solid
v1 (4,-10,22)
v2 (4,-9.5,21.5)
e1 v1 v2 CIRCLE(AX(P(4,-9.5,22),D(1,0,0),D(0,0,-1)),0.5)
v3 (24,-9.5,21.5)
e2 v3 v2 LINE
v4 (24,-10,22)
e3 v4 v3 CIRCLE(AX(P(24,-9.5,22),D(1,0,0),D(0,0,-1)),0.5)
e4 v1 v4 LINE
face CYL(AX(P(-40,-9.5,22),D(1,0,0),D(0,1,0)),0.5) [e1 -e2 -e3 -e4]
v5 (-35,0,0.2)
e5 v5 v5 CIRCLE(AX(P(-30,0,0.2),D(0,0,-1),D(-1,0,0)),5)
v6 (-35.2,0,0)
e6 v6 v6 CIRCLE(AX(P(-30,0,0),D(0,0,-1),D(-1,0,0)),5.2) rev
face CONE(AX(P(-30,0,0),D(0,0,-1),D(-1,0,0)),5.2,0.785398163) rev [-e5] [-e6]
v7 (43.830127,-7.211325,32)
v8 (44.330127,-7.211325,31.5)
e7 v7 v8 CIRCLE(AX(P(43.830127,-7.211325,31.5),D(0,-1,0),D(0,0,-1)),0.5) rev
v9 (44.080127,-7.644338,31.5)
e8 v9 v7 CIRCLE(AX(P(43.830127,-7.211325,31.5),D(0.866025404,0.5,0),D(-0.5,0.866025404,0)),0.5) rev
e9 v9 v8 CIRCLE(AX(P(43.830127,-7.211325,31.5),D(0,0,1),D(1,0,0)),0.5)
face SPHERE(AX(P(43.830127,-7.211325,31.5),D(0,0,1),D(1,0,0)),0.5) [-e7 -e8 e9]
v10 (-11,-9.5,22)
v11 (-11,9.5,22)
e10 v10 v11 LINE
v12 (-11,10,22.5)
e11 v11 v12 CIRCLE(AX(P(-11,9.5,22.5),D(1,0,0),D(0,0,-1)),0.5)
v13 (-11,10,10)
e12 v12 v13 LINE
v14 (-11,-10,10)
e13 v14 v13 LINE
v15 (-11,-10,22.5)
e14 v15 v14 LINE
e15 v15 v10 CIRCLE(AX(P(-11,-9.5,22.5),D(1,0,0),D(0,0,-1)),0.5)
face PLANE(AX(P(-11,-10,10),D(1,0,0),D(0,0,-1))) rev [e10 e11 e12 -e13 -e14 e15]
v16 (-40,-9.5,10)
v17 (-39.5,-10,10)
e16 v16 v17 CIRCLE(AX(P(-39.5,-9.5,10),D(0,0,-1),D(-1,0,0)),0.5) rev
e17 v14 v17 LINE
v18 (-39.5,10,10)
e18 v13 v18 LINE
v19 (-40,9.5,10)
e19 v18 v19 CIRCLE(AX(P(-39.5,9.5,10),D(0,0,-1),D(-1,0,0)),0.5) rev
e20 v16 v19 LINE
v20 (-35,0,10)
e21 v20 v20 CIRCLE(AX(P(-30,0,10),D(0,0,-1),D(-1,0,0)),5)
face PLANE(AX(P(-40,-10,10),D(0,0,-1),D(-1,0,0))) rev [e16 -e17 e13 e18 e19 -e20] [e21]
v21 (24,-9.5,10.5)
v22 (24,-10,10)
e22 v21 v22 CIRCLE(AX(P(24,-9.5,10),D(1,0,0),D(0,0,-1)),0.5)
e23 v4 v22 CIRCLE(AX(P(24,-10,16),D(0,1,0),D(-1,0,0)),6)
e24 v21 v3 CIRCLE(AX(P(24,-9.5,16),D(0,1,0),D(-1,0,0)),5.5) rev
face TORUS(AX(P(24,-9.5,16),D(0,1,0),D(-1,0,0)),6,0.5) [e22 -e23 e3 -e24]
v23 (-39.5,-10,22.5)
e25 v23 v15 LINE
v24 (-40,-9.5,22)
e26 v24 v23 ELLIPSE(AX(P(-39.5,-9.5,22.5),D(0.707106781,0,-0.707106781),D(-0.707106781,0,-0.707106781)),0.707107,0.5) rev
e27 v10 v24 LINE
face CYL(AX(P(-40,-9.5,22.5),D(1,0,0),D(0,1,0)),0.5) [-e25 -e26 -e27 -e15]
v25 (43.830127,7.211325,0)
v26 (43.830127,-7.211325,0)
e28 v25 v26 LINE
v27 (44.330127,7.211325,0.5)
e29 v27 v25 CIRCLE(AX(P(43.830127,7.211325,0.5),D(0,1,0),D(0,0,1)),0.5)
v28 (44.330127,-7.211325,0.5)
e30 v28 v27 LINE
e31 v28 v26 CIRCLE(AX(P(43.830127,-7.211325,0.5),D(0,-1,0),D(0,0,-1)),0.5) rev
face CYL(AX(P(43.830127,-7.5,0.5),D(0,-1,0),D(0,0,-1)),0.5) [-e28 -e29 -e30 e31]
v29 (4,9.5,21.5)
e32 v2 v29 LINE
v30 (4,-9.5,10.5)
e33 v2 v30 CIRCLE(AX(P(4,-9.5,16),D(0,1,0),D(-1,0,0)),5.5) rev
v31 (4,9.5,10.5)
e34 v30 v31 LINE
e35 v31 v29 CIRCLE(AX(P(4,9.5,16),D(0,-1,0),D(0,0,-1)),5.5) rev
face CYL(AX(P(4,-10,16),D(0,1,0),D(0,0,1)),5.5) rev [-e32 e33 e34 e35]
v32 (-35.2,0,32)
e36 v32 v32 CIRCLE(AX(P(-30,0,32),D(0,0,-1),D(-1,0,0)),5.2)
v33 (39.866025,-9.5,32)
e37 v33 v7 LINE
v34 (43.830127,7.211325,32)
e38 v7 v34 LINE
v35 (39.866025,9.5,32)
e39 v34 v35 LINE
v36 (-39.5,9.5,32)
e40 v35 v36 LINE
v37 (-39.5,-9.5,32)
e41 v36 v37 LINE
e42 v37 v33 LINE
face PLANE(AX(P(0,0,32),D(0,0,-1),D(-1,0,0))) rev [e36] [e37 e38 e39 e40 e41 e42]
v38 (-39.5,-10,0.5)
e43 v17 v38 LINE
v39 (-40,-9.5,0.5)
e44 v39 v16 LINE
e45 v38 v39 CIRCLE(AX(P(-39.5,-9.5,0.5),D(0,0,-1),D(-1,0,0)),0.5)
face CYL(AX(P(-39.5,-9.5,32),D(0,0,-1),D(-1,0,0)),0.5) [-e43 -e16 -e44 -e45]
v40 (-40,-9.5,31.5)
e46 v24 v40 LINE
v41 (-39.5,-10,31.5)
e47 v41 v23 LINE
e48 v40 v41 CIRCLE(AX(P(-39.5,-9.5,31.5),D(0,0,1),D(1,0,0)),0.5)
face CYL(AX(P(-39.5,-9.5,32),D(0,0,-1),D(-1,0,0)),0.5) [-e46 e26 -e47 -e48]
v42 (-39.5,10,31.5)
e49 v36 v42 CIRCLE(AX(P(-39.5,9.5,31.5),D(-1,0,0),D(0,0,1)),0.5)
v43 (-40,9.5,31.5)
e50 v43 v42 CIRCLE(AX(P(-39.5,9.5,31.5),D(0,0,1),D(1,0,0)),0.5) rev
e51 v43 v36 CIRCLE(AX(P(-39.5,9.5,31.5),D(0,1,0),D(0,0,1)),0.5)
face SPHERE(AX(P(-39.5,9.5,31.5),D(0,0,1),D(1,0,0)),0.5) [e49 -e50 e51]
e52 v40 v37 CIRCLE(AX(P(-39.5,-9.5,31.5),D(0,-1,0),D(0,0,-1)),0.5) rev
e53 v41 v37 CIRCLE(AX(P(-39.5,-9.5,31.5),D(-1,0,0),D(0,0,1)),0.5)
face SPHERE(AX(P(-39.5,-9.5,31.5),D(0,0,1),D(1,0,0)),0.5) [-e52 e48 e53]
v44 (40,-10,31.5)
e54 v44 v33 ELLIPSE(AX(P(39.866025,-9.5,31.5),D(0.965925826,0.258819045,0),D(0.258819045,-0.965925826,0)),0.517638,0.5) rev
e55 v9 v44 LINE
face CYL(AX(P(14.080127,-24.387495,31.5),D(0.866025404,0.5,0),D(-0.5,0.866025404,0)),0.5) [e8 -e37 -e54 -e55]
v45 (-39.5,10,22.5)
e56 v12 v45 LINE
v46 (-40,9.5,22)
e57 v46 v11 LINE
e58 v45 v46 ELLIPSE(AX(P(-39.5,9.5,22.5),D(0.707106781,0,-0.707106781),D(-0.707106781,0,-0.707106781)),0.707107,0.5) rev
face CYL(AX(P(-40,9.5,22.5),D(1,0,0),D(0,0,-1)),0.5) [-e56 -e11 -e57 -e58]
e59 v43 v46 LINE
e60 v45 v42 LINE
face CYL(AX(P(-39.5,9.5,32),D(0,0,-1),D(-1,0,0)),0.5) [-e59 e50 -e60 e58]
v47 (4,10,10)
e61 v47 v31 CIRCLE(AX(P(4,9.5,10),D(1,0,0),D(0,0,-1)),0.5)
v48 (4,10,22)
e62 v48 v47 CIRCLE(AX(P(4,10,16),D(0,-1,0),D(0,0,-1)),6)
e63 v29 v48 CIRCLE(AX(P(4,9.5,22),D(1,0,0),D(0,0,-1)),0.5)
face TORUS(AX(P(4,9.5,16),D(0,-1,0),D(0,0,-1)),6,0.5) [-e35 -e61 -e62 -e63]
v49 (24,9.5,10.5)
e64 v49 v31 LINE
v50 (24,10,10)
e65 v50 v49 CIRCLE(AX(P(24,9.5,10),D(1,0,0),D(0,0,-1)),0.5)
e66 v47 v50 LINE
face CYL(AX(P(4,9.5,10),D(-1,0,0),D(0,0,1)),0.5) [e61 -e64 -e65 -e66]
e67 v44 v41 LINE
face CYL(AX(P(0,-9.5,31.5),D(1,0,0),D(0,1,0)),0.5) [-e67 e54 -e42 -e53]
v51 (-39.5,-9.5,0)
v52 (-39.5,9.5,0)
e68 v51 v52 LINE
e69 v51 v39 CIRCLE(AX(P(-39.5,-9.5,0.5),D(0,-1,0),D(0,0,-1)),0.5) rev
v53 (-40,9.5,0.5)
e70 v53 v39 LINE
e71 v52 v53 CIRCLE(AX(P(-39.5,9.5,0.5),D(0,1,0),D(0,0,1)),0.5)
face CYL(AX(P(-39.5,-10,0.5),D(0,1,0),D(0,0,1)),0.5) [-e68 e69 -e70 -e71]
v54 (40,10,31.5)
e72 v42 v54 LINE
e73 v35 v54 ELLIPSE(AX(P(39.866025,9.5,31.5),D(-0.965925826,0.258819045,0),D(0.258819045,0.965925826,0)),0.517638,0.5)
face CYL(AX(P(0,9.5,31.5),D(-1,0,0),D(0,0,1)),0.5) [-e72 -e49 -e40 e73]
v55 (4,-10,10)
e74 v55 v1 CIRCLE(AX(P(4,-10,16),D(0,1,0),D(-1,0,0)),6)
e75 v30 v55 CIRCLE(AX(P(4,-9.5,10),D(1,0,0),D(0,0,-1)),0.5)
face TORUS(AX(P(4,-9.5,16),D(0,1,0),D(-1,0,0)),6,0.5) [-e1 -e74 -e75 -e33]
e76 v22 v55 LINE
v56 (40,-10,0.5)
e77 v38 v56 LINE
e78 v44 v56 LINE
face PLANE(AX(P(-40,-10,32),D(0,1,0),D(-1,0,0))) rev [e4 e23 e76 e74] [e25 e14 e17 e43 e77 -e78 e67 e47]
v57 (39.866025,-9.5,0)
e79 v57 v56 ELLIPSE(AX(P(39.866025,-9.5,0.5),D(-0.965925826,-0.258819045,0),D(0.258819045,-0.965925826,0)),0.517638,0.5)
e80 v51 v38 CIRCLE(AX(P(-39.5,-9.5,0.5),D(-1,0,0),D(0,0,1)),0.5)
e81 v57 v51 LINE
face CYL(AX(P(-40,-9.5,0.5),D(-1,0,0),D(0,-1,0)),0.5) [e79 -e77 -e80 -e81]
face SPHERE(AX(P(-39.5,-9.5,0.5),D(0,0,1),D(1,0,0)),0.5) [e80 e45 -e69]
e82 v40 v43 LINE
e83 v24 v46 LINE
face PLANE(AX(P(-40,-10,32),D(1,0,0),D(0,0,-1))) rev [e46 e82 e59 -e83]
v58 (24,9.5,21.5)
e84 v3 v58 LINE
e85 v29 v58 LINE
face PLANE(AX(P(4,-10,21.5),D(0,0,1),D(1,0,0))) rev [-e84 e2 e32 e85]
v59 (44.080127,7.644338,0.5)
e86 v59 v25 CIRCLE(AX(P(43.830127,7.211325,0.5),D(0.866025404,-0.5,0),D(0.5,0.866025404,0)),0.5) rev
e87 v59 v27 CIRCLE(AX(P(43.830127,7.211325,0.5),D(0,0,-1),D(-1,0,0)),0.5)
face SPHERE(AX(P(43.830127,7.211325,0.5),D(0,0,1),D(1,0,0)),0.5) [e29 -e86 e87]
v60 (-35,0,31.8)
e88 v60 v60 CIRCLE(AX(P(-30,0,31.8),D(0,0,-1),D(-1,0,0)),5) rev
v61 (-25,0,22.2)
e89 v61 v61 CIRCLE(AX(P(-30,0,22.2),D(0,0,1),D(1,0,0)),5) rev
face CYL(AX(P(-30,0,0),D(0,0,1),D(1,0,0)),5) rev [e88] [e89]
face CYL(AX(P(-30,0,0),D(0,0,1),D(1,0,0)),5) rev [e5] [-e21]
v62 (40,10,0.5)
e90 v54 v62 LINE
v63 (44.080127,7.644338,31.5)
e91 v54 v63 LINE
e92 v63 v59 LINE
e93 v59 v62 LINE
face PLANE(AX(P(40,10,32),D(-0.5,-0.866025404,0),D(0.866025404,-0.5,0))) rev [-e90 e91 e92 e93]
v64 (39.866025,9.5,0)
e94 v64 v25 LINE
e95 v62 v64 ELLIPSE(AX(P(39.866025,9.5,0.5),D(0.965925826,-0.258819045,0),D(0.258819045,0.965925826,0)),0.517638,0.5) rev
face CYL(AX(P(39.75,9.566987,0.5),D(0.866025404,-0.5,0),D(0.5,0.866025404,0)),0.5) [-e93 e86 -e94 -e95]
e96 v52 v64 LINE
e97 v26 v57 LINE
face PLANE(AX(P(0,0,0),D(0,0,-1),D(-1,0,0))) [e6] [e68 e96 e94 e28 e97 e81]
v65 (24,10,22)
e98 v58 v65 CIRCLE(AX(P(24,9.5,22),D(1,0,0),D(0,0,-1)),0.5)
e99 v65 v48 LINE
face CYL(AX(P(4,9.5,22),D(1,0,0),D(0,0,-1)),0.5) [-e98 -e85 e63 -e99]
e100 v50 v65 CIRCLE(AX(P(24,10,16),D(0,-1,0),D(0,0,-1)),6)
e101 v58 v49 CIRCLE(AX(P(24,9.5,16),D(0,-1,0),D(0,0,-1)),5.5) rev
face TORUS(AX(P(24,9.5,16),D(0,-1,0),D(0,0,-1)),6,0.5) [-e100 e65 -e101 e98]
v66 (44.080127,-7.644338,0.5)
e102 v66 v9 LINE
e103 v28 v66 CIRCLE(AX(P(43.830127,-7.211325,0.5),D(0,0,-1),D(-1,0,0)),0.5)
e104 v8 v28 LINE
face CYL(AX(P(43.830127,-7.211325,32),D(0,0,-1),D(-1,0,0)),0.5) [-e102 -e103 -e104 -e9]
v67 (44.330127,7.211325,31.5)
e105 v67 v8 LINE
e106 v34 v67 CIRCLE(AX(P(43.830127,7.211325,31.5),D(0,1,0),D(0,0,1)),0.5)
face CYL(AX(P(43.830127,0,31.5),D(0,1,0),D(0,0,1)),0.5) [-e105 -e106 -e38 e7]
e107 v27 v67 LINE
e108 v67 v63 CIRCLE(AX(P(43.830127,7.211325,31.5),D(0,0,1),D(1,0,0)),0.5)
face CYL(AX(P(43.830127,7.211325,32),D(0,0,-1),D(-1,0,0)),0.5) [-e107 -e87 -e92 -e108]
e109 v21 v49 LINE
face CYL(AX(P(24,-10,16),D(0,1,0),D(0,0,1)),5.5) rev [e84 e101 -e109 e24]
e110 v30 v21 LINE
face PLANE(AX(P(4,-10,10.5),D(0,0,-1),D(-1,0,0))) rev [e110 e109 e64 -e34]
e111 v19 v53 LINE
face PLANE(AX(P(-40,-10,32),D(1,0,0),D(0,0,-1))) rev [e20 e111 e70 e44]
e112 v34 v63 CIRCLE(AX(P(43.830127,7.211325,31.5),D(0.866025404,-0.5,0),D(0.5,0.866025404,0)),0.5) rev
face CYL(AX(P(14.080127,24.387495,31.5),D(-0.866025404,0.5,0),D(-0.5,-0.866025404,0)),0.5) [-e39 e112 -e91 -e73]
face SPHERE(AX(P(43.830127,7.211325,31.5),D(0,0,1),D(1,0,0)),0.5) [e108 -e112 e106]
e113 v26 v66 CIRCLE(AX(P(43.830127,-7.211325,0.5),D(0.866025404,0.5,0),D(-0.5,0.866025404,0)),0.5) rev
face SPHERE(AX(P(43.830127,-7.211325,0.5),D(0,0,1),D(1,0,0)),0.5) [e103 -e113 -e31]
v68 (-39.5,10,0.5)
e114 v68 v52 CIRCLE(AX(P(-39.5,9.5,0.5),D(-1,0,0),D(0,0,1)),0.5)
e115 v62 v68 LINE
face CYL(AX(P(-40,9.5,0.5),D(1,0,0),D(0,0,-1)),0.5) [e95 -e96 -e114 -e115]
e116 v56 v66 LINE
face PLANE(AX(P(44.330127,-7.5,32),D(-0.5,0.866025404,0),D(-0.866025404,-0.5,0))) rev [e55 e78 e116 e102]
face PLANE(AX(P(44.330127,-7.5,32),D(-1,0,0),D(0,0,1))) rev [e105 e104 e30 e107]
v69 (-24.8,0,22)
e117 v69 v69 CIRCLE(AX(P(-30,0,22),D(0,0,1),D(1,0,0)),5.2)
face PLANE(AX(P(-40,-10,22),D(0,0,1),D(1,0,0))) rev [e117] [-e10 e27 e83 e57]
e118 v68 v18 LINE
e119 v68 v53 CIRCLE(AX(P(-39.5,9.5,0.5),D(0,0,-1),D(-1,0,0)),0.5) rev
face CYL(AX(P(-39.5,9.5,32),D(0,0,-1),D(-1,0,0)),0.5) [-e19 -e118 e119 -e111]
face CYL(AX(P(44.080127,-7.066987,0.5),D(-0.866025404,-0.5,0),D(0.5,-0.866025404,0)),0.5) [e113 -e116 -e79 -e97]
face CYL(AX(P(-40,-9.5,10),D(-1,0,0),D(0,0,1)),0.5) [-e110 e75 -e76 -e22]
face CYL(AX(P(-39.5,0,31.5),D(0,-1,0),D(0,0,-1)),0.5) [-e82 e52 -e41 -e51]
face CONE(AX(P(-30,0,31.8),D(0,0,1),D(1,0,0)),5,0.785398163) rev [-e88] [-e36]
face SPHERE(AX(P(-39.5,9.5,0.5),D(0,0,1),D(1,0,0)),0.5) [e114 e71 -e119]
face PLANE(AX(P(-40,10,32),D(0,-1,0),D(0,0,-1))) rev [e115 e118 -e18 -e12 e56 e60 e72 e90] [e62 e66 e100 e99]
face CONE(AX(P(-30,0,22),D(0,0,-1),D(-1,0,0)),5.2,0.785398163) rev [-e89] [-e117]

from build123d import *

# Parameters (mm, degrees)
BASE_BRIDE_DEPTH          = 32
CONG_BRIDE1_R             = 0.5
ESQUISSE_ENL_V_MAT_BRID_W = 29
ESQUISSE_ENL_V_MAT_BRID_H = 12
ENL_V_MATI_RE_BRIDE_DEPTH = 59.216493896
CONG_BRIDE2_R             = 0.5
ESQUISSE_PERCAGE_BRIDE_R  = 5
PERCAGE_BRIDE_DEPTH       = 56.580213759
CHANFREIN_BRIDE_SIZE      = 0.2


with BuildPart() as part:
    # esquisse_base_bride → Base_bride (new body)
    with BuildSketch(Plane.XY):
        Polygon((40, 10), (44.330127019, 7.5), (44.330127019, -7.5), (40, -10), (-40, -10), (-40, 10), align=None)
    extrude(amount=BASE_BRIDE_DEPTH)

    # congé_bride1
    cong_bride1_edges = [part.edges().sort_by_distance(p)[0] for p in [
        (42.165063509, -8.75, 32),
        (-40, 10, 16),
        (44.330127019, 7.5, 16),
        (44.330127019, -7.5, 16),
        (-40, -10, 16),
        (44.330127019, 0, 32),
        (42.165063509, 8.75, 32),
        (0, 10, 32),
        (-40, 0, 32),
        (0, 10, 0),
        (42.165063509, 8.75, 0),
        (44.330127019, 0, 0),
        (0, -10, 32),
        (42.165063509, -8.75, 0),
        (0, -10, 0),
        (-40, 0, 0),
    ]]
    fillet(cong_bride1_edges, radius=CONG_BRIDE1_R)

    # esquisse_enlèv.mat.brid → enlèv.matière_bride (cut, through all)
    with BuildSketch(Plane(origin=(0, 10, 0), x_dir=(1, 0, 0), z_dir=(0, 1, 0))):
        with Locations((-25.5, -16)):
            Rectangle(ESQUISSE_ENL_V_MAT_BRID_W, ESQUISSE_ENL_V_MAT_BRID_H)
        with BuildLine():
            Line((4, -10.5), (24, -10.5))
            ThreePointArc((24, -10.5), (29.5, -16), (24, -21.5))
            Line((24, -21.5), (4, -21.5))
            ThreePointArc((4, -21.5), (-1.5, -16), (4, -10.5))
        make_face()
    extrude(amount=-ENL_V_MATI_RE_BRIDE_DEPTH, mode=Mode.SUBTRACT)

    # congé_bride2
    # the kernel refuses this fillet: 0.5 mm, written as the material it takes off along each edge
    with BuildSketch(Plane(origin=(-40.75, -10, 22), x_dir=(0, 1, 0), z_dir=(1, 0, 0))) as cong_bride2_piece_1:
        with BuildLine():
            CenterArc((CONG_BRIDE2_R, CONG_BRIDE2_R), CONG_BRIDE2_R, 180, 90)
            Line((0, CONG_BRIDE2_R), (0, 0))
            Line((0, 0), (CONG_BRIDE2_R, 0))
        make_face()
    extrude(amount=29.75, mode=Mode.SUBTRACT)
    with BuildSketch(Plane(origin=(-11, 10, 22), x_dir=(0, 0, 1), z_dir=(-1, 0, 0))) as cong_bride2_piece_2:
        with BuildLine():
            CenterArc((CONG_BRIDE2_R, -CONG_BRIDE2_R), CONG_BRIDE2_R, 90, 90)
            Line((0, -CONG_BRIDE2_R), (0, 0))
            Line((0, 0), (CONG_BRIDE2_R, 0))
        make_face()
    extrude(amount=29.75, mode=Mode.SUBTRACT)
    with BuildSketch(Plane(origin=(24, 10, 16), x_dir=(0, 0, -1), z_dir=(-1, 0, 0))) as cong_bride2_piece_3:
        with BuildLine():
            CenterArc((5.5 + CONG_BRIDE2_R, CONG_BRIDE2_R), CONG_BRIDE2_R, 180, 90)
            Line((5.5, CONG_BRIDE2_R), (5.5, 0))
            Line((5.5, 0), (5.5 + CONG_BRIDE2_R, 0))
        make_face()
    revolve(axis=Axis((24, 10, 16), (0, -1, 0)), revolution_arc=180, mode=Mode.SUBTRACT)
    with BuildSketch(Plane(origin=(4, 10, 10.5), x_dir=(0, 0, -1), z_dir=(1, 0, 0)), Plane(origin=(24, 10, 21.5), x_dir=(0, 0, 1), z_dir=(-1, 0, 0))) as cong_bride2_piece_4:
        with BuildLine():
            CenterArc((CONG_BRIDE2_R, -CONG_BRIDE2_R), CONG_BRIDE2_R, 90, 90)
            Line((0, -CONG_BRIDE2_R), (0, 0))
            Line((0, 0), (CONG_BRIDE2_R, 0))
        make_face()
    extrude(amount=20, mode=Mode.SUBTRACT)
    with BuildSketch(Plane(origin=(4, 10, 16), x_dir=(0, 0, 1), z_dir=(1, 0, 0))) as cong_bride2_piece_5:
        with BuildLine():
            CenterArc((5.5 + CONG_BRIDE2_R, CONG_BRIDE2_R), CONG_BRIDE2_R, 180, 90)
            Line((5.5, CONG_BRIDE2_R), (5.5, 0))
            Line((5.5, 0), (5.5 + CONG_BRIDE2_R, 0))
        make_face()
    revolve(axis=Axis((4, 10, 16), (0, -1, 0)), revolution_arc=180, mode=Mode.SUBTRACT)
    with BuildSketch(Plane(origin=(24, -10, 16), x_dir=(0, 0, 1), z_dir=(-1, 0, 0))) as cong_bride2_piece_6:
        with BuildLine():
            CenterArc((5.5 + CONG_BRIDE2_R, CONG_BRIDE2_R), CONG_BRIDE2_R, 180, 90)
            Line((5.5 + CONG_BRIDE2_R, 0), (5.5, 0))
            Line((5.5, 0), (5.5, CONG_BRIDE2_R))
        make_face()
    revolve(axis=Axis((24, -10, 16), (0, 1, 0)), revolution_arc=180, mode=Mode.SUBTRACT)
    with BuildSketch(Plane(origin=(24, -10, 10.5), x_dir=(0, 1, 0), z_dir=(-1, 0, 0)), Plane(origin=(4, -10, 21.5), x_dir=(0, 1, 0), z_dir=(1, 0, 0))) as cong_bride2_piece_7:
        with BuildLine():
            CenterArc((CONG_BRIDE2_R, CONG_BRIDE2_R), CONG_BRIDE2_R, 180, 90)
            Line((0, CONG_BRIDE2_R), (0, 0))
            Line((0, 0), (CONG_BRIDE2_R, 0))
        make_face()
    extrude(amount=20, mode=Mode.SUBTRACT)
    with BuildSketch(Plane(origin=(4, -10, 16), x_dir=(0, 0, -1), z_dir=(1, 0, 0))) as cong_bride2_piece_8:
        with BuildLine():
            CenterArc((5.5 + CONG_BRIDE2_R, CONG_BRIDE2_R), CONG_BRIDE2_R, 180, 90)
            Line((5.5 + CONG_BRIDE2_R, 0), (5.5, 0))
            Line((5.5, 0), (5.5, CONG_BRIDE2_R))
        make_face()
    revolve(axis=Axis((4, -10, 16), (0, 1, 0)), revolution_arc=180, mode=Mode.SUBTRACT)

    # esquisse_percage_bride → percage_bride (cut, through all)
    with BuildSketch(Plane.XY.offset(32)):
        with Locations((-30, 0)):
            Circle(ESQUISSE_PERCAGE_BRIDE_R)
    extrude(amount=-PERCAGE_BRIDE_DEPTH, mode=Mode.SUBTRACT)

    # chanfrein_bride
    chanfrein_bride_edges = [part.edges().sort_by_distance(p)[0] for p in [
        (-35, 0, 0),
        (-35, 0, 22),
        (-35, 0, 32),
    ]]
    chamfer(chanfrein_bride_edges, length=CHANFREIN_BRIDE_SIZE)


solid = part.part
